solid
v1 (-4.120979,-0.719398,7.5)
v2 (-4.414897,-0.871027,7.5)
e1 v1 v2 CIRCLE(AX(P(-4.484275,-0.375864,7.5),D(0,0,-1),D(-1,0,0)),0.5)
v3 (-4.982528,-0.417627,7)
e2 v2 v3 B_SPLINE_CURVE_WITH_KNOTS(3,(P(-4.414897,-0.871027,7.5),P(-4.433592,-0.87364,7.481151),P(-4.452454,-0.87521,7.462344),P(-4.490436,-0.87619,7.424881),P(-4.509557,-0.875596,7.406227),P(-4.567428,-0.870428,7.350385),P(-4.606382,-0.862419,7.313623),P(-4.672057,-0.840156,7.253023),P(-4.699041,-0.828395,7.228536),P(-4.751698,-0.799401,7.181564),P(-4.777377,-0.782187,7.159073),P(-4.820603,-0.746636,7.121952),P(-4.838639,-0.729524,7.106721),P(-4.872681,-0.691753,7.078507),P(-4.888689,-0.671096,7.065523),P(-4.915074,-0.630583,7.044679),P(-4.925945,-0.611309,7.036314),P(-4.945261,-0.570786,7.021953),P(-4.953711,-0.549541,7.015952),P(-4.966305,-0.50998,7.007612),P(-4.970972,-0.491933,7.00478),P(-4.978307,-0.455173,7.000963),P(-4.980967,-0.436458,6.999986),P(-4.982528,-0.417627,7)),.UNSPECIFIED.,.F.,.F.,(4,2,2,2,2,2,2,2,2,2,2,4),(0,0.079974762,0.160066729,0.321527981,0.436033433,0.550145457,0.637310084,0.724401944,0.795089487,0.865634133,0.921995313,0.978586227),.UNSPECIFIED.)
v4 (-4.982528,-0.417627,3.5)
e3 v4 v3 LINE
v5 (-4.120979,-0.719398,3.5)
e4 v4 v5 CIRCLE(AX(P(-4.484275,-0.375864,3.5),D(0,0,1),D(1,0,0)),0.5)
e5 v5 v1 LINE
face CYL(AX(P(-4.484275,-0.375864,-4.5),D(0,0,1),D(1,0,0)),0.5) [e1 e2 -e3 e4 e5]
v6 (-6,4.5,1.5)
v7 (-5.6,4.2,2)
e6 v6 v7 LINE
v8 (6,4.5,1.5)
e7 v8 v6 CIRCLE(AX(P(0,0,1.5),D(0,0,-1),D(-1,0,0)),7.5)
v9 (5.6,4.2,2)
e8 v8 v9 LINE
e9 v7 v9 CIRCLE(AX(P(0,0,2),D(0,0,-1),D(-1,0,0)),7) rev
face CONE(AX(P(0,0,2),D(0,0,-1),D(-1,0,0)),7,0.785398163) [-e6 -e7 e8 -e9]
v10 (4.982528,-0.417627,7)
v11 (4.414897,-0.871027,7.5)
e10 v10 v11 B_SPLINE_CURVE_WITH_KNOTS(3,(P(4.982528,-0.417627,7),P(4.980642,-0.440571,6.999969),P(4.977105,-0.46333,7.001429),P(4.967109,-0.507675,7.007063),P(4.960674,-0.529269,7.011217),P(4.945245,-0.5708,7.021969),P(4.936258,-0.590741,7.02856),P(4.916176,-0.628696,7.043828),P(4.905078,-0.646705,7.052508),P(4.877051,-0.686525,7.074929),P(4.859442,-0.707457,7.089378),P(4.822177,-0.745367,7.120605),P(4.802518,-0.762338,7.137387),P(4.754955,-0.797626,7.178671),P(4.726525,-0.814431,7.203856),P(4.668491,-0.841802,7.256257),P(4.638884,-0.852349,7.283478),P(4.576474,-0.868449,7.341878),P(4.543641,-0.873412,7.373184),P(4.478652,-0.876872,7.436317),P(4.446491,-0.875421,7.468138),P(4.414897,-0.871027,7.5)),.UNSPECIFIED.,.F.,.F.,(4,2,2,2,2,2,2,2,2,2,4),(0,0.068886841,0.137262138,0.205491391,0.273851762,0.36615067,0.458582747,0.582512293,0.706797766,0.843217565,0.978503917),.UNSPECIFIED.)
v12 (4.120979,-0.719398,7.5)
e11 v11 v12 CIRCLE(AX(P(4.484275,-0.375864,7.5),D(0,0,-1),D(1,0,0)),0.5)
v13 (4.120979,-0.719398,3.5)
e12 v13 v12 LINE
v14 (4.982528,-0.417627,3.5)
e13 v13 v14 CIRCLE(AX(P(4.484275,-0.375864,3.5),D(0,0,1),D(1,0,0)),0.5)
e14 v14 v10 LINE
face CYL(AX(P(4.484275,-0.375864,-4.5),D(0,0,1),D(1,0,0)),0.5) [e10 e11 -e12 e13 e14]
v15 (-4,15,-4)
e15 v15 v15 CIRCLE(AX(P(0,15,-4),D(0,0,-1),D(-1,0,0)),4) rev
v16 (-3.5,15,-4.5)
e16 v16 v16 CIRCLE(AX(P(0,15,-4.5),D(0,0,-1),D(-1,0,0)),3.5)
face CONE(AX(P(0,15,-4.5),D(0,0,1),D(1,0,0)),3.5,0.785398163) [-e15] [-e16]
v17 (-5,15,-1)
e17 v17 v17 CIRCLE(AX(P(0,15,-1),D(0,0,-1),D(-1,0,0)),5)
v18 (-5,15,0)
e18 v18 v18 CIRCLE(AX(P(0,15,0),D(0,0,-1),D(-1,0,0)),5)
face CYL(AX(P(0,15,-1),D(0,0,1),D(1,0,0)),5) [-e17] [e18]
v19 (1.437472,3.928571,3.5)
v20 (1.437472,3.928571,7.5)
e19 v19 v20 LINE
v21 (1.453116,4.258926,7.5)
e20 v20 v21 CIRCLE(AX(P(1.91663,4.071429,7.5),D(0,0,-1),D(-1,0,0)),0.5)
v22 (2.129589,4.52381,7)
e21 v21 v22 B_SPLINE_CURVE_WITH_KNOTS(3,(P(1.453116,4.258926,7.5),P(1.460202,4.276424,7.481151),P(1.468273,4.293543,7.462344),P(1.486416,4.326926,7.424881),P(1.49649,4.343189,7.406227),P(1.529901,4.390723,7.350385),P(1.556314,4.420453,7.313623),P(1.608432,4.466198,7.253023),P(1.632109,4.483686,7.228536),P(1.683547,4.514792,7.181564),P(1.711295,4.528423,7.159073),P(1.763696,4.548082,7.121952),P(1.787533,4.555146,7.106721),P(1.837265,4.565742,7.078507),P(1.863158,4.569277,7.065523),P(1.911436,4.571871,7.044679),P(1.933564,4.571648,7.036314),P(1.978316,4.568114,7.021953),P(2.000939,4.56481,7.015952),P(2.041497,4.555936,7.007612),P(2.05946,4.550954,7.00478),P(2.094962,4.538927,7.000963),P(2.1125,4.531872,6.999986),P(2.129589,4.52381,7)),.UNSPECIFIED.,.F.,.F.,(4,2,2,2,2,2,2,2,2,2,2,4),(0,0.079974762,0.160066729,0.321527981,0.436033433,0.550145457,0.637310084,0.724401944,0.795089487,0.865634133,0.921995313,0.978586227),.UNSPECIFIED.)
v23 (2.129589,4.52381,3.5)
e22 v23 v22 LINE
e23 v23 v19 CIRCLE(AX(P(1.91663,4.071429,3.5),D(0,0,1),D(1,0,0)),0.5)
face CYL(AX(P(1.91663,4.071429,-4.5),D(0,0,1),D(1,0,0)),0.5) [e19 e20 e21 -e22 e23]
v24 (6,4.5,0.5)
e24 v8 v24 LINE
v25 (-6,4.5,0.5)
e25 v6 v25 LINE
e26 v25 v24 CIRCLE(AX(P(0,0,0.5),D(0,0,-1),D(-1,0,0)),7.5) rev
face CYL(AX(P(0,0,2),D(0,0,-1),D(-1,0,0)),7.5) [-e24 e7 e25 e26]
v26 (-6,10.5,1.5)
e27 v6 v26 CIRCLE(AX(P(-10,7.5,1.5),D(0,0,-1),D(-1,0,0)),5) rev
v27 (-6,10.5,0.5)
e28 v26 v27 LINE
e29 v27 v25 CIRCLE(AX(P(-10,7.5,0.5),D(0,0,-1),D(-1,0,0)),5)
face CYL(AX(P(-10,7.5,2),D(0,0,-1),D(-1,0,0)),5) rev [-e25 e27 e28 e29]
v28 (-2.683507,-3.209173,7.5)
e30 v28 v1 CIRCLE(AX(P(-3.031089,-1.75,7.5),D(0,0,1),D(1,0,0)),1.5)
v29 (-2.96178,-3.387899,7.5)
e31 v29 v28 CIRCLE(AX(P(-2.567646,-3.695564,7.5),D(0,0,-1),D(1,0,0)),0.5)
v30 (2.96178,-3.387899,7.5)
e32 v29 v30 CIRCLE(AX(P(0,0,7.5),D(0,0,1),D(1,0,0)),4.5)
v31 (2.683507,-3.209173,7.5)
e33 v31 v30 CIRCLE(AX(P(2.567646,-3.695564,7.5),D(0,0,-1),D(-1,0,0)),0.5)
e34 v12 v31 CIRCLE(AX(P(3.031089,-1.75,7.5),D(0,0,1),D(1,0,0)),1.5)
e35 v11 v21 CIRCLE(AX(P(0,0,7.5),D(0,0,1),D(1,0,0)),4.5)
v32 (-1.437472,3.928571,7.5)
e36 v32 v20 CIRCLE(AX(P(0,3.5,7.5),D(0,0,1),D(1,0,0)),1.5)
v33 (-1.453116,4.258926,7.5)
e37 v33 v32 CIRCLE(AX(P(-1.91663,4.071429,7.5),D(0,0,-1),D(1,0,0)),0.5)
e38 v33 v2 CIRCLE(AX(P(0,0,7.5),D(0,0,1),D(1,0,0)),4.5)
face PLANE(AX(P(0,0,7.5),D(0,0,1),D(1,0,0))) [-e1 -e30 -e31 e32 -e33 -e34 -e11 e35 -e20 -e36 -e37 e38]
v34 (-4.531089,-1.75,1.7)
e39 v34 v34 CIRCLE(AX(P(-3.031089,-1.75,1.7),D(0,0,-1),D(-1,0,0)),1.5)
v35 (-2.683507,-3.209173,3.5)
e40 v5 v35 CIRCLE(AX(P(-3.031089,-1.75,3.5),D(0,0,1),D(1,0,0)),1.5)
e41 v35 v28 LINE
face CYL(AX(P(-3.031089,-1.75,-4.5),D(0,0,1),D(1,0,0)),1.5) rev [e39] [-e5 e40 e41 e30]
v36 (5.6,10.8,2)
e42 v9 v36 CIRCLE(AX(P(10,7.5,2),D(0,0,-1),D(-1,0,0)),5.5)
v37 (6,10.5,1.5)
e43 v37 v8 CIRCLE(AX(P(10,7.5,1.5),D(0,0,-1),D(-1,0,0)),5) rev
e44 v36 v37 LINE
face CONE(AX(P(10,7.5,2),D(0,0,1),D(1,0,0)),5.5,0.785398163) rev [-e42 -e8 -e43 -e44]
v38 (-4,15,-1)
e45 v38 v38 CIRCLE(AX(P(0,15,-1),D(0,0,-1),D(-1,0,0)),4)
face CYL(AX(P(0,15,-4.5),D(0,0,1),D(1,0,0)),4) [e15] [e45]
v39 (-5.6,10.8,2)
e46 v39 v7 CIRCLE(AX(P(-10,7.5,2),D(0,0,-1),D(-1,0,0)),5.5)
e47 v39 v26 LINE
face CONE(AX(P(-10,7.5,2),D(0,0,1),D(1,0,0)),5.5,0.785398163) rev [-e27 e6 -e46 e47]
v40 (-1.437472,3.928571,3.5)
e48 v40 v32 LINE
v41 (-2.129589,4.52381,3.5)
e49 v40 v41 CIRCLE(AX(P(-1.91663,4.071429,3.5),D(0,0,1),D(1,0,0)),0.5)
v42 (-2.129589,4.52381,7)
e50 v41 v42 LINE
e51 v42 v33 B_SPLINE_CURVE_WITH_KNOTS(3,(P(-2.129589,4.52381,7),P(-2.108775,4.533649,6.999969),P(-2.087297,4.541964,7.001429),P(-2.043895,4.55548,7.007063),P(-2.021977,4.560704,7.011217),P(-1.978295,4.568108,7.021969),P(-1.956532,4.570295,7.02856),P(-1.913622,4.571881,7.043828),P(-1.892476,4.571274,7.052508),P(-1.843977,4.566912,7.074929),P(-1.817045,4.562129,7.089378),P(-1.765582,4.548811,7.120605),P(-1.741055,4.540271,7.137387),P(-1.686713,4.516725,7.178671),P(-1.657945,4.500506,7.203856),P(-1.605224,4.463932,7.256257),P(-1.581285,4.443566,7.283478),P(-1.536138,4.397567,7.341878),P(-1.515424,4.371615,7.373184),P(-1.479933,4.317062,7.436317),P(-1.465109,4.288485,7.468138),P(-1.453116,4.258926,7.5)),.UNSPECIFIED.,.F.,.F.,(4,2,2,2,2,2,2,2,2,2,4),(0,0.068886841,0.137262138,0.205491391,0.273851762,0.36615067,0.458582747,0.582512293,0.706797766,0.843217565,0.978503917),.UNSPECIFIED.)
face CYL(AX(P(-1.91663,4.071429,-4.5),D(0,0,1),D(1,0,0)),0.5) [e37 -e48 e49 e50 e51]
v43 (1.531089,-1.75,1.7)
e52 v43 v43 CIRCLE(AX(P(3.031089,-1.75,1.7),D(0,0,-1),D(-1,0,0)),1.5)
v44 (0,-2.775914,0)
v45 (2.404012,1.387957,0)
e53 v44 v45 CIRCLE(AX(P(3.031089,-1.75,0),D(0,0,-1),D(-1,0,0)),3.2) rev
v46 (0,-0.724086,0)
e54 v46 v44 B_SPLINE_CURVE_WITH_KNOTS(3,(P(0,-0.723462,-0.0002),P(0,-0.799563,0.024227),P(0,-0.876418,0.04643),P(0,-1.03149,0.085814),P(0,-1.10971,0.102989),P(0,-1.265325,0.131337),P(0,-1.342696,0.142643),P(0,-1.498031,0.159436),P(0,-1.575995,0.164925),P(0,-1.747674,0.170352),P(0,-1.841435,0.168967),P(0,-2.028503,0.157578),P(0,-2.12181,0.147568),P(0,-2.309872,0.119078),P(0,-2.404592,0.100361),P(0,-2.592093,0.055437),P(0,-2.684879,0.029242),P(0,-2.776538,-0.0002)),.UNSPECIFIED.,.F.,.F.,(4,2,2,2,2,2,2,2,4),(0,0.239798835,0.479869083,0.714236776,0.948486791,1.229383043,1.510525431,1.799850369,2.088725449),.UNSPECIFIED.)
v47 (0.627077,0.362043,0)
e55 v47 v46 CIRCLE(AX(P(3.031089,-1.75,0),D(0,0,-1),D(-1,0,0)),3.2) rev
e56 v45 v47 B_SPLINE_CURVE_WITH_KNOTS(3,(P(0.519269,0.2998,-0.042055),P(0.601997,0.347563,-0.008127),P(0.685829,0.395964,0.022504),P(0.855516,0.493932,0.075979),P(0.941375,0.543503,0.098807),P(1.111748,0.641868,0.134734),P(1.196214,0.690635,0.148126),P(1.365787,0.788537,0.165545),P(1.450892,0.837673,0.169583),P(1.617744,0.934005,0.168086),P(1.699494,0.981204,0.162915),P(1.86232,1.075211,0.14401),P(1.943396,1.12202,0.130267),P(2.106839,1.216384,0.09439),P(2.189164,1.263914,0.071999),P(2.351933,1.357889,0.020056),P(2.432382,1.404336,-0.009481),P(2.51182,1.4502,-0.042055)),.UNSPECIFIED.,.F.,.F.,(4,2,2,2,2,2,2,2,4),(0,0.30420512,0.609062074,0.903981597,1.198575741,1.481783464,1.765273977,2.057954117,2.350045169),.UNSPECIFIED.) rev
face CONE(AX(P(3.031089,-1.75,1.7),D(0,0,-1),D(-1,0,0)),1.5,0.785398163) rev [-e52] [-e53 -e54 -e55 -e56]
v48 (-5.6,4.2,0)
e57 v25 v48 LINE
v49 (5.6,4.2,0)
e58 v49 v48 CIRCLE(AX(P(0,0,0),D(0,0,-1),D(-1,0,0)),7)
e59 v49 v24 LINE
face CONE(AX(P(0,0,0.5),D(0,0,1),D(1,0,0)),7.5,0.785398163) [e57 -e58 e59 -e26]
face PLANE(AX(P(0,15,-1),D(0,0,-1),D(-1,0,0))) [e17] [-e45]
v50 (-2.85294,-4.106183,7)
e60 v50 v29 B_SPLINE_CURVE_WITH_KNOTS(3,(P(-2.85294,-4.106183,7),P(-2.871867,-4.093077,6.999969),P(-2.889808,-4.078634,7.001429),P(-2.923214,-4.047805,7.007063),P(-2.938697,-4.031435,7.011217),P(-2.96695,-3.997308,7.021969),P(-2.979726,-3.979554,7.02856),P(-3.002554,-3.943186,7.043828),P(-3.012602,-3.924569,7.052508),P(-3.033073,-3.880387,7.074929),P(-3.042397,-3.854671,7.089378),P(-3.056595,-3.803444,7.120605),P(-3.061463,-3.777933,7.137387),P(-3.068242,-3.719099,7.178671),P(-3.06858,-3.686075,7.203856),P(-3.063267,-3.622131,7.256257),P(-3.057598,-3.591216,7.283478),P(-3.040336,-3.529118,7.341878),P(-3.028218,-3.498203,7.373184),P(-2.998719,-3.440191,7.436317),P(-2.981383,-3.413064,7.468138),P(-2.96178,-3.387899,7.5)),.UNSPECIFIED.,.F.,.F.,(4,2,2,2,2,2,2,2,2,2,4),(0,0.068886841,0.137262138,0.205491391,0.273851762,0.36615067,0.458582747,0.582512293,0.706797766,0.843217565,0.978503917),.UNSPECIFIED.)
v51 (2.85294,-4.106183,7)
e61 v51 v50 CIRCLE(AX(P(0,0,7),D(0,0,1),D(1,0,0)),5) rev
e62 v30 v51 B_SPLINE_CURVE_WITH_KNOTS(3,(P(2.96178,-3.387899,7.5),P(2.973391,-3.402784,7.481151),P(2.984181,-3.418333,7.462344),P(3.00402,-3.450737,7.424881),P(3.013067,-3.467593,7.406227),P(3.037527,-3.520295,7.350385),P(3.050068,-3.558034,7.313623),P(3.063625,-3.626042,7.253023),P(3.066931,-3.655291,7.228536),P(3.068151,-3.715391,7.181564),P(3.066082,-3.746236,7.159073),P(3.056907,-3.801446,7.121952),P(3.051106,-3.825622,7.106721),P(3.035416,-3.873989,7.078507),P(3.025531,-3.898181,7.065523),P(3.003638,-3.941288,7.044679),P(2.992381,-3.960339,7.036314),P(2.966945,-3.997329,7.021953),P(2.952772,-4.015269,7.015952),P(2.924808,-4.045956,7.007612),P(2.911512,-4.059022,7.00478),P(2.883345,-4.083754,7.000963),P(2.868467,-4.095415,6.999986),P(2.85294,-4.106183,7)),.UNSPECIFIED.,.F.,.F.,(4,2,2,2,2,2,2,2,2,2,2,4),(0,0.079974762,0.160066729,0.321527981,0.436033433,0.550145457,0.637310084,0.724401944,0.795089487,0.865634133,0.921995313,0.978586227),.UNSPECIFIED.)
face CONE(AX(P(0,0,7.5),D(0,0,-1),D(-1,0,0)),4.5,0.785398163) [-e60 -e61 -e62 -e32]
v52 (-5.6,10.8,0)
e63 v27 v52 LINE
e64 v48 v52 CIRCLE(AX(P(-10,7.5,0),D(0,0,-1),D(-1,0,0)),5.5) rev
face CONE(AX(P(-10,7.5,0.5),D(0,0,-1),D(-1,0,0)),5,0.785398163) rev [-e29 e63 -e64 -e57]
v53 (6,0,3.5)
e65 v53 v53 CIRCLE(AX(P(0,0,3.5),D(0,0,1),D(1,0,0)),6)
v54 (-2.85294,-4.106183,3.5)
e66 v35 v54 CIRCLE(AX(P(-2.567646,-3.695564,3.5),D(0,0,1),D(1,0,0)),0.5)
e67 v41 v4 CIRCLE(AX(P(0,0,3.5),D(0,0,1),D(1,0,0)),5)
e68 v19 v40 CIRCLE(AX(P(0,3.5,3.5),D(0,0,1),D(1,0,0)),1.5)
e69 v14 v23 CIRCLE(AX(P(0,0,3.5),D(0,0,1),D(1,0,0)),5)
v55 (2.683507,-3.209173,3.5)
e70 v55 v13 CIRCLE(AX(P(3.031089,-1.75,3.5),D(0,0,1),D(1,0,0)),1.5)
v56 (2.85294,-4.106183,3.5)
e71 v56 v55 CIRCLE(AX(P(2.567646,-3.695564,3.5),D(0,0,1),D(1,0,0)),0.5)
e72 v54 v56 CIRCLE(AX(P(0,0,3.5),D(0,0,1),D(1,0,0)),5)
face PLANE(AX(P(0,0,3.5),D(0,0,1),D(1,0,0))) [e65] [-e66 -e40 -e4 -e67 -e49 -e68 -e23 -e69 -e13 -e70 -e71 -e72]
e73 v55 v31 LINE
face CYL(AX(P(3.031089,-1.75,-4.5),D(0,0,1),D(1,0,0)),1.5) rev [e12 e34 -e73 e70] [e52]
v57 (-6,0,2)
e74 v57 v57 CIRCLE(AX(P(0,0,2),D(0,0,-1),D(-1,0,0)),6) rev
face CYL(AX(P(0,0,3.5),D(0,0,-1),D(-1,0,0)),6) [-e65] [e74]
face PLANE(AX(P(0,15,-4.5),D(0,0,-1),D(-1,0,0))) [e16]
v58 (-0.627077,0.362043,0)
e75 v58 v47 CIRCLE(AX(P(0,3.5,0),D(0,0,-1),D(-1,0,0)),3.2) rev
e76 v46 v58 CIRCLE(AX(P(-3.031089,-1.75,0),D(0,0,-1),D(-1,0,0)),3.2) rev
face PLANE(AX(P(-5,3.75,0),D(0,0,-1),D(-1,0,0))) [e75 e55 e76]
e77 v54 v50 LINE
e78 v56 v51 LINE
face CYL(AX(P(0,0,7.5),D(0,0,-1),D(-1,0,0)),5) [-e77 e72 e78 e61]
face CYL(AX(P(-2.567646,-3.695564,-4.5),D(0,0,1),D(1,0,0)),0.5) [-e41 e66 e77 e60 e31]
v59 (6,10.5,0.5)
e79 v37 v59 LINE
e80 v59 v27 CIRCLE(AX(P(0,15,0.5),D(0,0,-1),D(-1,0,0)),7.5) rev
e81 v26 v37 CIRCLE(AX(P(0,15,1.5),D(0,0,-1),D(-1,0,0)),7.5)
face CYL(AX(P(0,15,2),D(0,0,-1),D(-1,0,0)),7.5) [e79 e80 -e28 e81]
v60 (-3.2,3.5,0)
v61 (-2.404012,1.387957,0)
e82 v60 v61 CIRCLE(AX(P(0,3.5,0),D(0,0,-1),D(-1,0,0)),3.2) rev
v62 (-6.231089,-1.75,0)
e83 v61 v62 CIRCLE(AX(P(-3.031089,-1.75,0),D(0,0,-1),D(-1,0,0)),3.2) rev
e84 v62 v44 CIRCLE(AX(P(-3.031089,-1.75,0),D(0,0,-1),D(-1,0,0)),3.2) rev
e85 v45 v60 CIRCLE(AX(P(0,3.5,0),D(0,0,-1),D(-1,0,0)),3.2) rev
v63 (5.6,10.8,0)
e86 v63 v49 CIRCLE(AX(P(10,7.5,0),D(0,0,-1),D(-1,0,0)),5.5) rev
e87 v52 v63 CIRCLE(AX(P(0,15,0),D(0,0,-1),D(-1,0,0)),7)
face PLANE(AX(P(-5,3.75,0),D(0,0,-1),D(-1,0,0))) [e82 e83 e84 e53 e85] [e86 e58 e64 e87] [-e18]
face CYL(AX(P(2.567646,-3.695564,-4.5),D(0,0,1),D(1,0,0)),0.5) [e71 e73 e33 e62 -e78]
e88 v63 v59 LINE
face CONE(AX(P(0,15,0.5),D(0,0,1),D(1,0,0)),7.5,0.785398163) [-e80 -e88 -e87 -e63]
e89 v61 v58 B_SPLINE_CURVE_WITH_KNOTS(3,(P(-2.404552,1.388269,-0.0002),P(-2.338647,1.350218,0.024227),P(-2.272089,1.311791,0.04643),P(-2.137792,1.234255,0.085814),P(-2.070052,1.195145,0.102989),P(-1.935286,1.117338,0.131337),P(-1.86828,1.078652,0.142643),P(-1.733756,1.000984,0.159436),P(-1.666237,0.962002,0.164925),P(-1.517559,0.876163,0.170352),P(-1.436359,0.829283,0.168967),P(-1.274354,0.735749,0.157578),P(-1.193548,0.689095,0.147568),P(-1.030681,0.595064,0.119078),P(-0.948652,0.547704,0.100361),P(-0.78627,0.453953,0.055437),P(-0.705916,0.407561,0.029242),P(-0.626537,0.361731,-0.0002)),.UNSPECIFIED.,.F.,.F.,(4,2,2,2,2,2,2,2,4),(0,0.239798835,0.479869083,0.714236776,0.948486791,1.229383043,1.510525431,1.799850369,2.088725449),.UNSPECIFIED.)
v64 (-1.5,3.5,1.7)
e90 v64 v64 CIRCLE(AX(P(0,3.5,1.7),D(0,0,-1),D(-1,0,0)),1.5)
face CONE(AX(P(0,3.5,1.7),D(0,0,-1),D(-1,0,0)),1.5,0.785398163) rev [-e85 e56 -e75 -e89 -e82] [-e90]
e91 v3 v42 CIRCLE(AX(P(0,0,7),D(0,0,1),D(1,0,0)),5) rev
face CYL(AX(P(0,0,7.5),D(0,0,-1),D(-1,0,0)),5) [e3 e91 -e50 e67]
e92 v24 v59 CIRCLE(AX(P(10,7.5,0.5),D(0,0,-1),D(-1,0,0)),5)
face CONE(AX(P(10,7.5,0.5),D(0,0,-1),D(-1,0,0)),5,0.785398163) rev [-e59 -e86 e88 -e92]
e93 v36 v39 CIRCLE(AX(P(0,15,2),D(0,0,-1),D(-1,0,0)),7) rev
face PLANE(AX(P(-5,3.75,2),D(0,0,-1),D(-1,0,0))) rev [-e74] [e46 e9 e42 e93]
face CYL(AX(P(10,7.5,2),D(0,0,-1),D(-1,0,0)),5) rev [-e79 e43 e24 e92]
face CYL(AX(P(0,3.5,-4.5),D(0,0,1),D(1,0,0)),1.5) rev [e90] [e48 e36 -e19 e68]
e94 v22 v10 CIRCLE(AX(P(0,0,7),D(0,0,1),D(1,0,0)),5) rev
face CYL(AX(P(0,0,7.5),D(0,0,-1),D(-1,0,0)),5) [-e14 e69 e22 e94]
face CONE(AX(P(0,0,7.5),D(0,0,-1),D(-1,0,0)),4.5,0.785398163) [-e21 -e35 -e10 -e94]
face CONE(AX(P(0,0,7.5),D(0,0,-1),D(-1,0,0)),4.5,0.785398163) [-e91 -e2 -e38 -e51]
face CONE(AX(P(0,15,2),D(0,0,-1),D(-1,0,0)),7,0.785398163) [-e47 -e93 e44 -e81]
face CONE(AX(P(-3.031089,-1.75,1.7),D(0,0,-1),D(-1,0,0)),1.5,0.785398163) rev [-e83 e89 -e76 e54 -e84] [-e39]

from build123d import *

# Parameters (mm, degrees)
EXTRUDE_1_DEPTH     = 2
SKETCH_2_R          = 6
EXTRUDE_2_DEPTH     = 1.5
SKETCH_3_R          = 5
EXTRUDE_3_DEPTH     = 4
SKETCH_4_R          = 5
EXTRUDE_4_DEPTH     = 1
SKETCH_5_R          = 4
EXTRUDE_5_DEPTH     = 3.5
CUT_EXTRUDE_1_DEPTH = 27.58006772
EXTRUDE_START       = -3.5
SKETCH_9_R          = 6
EXTRUDE_6_DEPTH     = 3.5
SKETCH_10_R         = 1.5
CUT_EXTRUDE_2_DEPTH = 26.029982022
CHAMFER_1_SIZE      = 1.7
CHAMFER_2_SIZE      = 0.5
CHAMFER_3_SIZE      = 0.5


with BuildPart() as part:
    # ｽｹｯﾁ1 → ﾎﾞｽ - 押し出し1 (new body)
    with BuildSketch(Plane.XY):
        with BuildLine():
            ThreePointArc((-6, 4.5), (0, -7.5), (6, 4.5))
            ThreePointArc((6, 4.5), (5, 7.5), (6, 10.5))
            ThreePointArc((6, 10.5), (0, 22.5), (-6, 10.5))
            ThreePointArc((-6, 10.5), (-5, 7.5), (-6, 4.5))
        make_face()
    extrude(amount=EXTRUDE_1_DEPTH)

    # ｽｹｯﾁ2 → ﾎﾞｽ - 押し出し2 (add)
    with BuildSketch(Plane.XY.offset(2)):
        with Locations(Location((0, 0, 0), (0, 0, 180))):
            Circle(SKETCH_2_R)
    extrude(amount=EXTRUDE_2_DEPTH)

    # ｽｹｯﾁ3 → ﾎﾞｽ - 押し出し3 (add)
    with BuildSketch(Plane.XY.offset(3.5)):
        Circle(SKETCH_3_R)
    extrude(amount=EXTRUDE_3_DEPTH)

    # ｽｹｯﾁ4 → ﾎﾞｽ - 押し出し4 (add)
    with BuildSketch(Plane(origin=(0, 0, 0), x_dir=(-1, 0, 0), z_dir=(0, 0, -1))):
        with Locations((0, 15)):
            Circle(SKETCH_4_R)
    extrude(amount=EXTRUDE_4_DEPTH)

    # ｽｹｯﾁ5 → ﾎﾞｽ - 押し出し5 (add)
    with BuildSketch(Plane(origin=(0, 0, -1), x_dir=(-1, 0, 0), z_dir=(0, 0, -1))):
        with Locations((0, 15)):
            Circle(SKETCH_5_R)
    extrude(amount=EXTRUDE_5_DEPTH)

    # ｽｹｯﾁ8 → ｶｯﾄ - 押し出し1 (cut, through all)
    with BuildSketch(Plane.XY.offset(7.5)):
        with BuildLine():
            ThreePointArc((-1.437472271, 3.928571429), (0, 2), (1.437472271, 3.928571429))
            ThreePointArc((1.437472271, 3.928571429), (1.590604363, 4.45051627), (2.12958855, 4.523809524))
            ThreePointArc((2.12958855, 4.523809524), (0, 5), (-2.12958855, 4.523809524))
            ThreePointArc((-2.12958855, 4.523809524), (-1.590604363, 4.45051627), (-1.437472271, 3.928571429))
        make_face()
        with BuildLine():
            ThreePointArc((4.120978793, -0.71939821), (1.732050808, -1), (2.683506522, -3.209173218))
            ThreePointArc((2.683506522, -3.209173218), (3.058957968, -3.602761921), (2.852939695, -4.106182546))
            ThreePointArc((2.852939695, -4.106182546), (4.330127019, -2.5), (4.982528245, -0.417626978))
            ThreePointArc((4.982528245, -0.417626978), (4.649562331, -0.847754349), (4.120978793, -0.71939821))
        make_face()
        with BuildLine():
            ThreePointArc((-2.683506522, -3.209173218), (-1.732050808, -1), (-4.120978793, -0.71939821))
            ThreePointArc((-4.120978793, -0.71939821), (-4.649562331, -0.847754349), (-4.982528245, -0.417626978))
            ThreePointArc((-4.982528245, -0.417626978), (-4.330127019, -2.5), (-2.852939695, -4.106182546))
            ThreePointArc((-2.852939695, -4.106182546), (-3.058957968, -3.602761921), (-2.683506522, -3.209173218))
        make_face()
    extrude(amount=-CUT_EXTRUDE_1_DEPTH, mode=Mode.SUBTRACT)

    # ｽｹｯﾁ9 → ﾎﾞｽ - 押し出し6 (add)
    with BuildSketch(Plane.XY.offset(3.5).offset(EXTRUDE_START)):
        with Locations(Location((0, 0, 0), (0, 0, 180))):
            Circle(SKETCH_9_R)
    extrude(amount=EXTRUDE_6_DEPTH)

    # ｽｹｯﾁ10 → ｶｯﾄ - 押し出し2 (cut, through all)
    with BuildSketch(Plane.XY.offset(3.5)):
        with Locations(Location((0, 3.5, 0), (0, 0, 16.601549599))):
            Circle(SKETCH_10_R)
        with Locations(Location((-3.031088913, -1.75, 0), (0, 0, 283.398450401))):
            Circle(SKETCH_10_R)
        with Locations(Location((3.031088913, -1.75, 0), (0, 0, 43.398450401))):
            Circle(SKETCH_10_R)
    extrude(amount=-CUT_EXTRUDE_2_DEPTH, mode=Mode.SUBTRACT)

    # 面取り1
    # the kernel refuses this chamfer: 1.7 mm, written as the material it takes off along each edge
    with BuildSketch(Plane(origin=(0, 3.5, 0), x_dir=(0.9583148475000108, 0.28571428571394725, 0), z_dir=(0.28571428571394725, -0.9583148475000108, 0))) as chamfer_1_piece_1:
        Polygon((1.5 + CHAMFER_1_SIZE, 0), (1.5, CHAMFER_1_SIZE), (1.5, 0), align=None)
    revolve(axis=Axis((0, 3.5, 0), (0, 0, 1)), mode=Mode.SUBTRACT)
    with BuildSketch(Plane(origin=(-3.031088913, -1.75, 0), x_dir=(0.2317215940976018, -0.9727821456157932, 0), z_dir=(-0.9727821456157932, -0.2317215940976018, 0))) as chamfer_1_piece_2:
        Polygon((1.5 + CHAMFER_1_SIZE, 0), (1.5, CHAMFER_1_SIZE), (1.5, 0), align=None)
    revolve(axis=Axis((-3.031088913, -1.75, 0), (0, 0, 1)), mode=Mode.SUBTRACT)
    with BuildSketch(Plane(origin=(3.031088913, -1.75, 0), x_dir=(0.7265932534024093, 0.6870678599018457, 0), z_dir=(0.6870678599018457, -0.7265932534024093, 0))) as chamfer_1_piece_3:
        Polygon((1.5 + CHAMFER_1_SIZE, 0), (1.5, CHAMFER_1_SIZE), (1.5, 0), align=None)
    revolve(axis=Axis((3.031088913, -1.75, 0), (0, 0, 1)), mode=Mode.SUBTRACT)

    # 面取り2
    chamfer_2_edges = [part.edges().sort_by_distance(p)[0] for p in [
        (4, 15, -4.5),
        (0, 22.5, 0),
        (5, 7.5, 0),
        (0, -7.5, 0),
        (-5, 7.5, 0),
    ]]
    chamfer(chamfer_2_edges, length=CHAMFER_2_SIZE)

    # 面取り3
    # the kernel refuses this chamfer: 0.5 mm, written as the material it takes off along each edge
    with BuildSketch(Plane(origin=(10, 7.5, 2), x_dir=(-0.7999999999999996, -0.6000000000000005, 0), z_dir=(0.6000000000000005, -0.7999999999999996, 0))) as chamfer_3_piece_1:
        Polygon((5, CHAMFER_3_SIZE), (5 + CHAMFER_3_SIZE, 0), (5, 0), align=None)
    revolve(axis=Axis((10, 7.5, 2), (0, 0, -1)), revolution_arc=73.739795292, mode=Mode.SUBTRACT)
    with BuildSketch(Plane(origin=(0, 15, 2), x_dir=(0.7999999999999998, -0.6000000000000002, 0), z_dir=(-0.6000000000000002, -0.7999999999999998, 0))) as chamfer_3_piece_2:
        Polygon((7.5 - CHAMFER_3_SIZE, 0), (7.5, -CHAMFER_3_SIZE), (7.5, 0), align=None)
    revolve(axis=Axis((0, 15, 2), (0, 0, 1)), revolution_arc=253.739795292, mode=Mode.SUBTRACT)
    with BuildSketch(Plane(origin=(0, 0, 7.5), x_dir=(-0.18173044344345904, 0.9833483848188515, 0), z_dir=(0.9833483848188515, 0.18173044344345904, 0))) as chamfer_3_piece_3:
        Polygon((5, -CHAMFER_3_SIZE), (5 - CHAMFER_3_SIZE, 0), (5, 0), align=None)
    revolve(axis=Axis((0, 0, 7.5), (0, 0, 1)), revolution_arc=99.05886102, mode=Mode.SUBTRACT)
    with BuildSketch(Plane(origin=(-10, 7.5, 2), x_dir=(0.8, 0.6, 0), z_dir=(-0.6, 0.8, 0))) as chamfer_3_piece_4:
        Polygon((5 + CHAMFER_3_SIZE, 0), (5, CHAMFER_3_SIZE), (5, 0), align=None)
    revolve(axis=Axis((-10, 7.5, 2), (0, 0, -1)), revolution_arc=73.739795292, mode=Mode.SUBTRACT)
    with BuildSketch(Plane(origin=(0, 0, 7.5), x_dir=(0.9424699037452493, -0.3342910117463833, 0), z_dir=(-0.3342910117463833, -0.9424699037452493, 0))) as chamfer_3_piece_5:
        Polygon((5, -CHAMFER_3_SIZE), (5 - CHAMFER_3_SIZE, 0), (5, 0), align=None)
    revolve(axis=Axis((0, 0, 7.5), (0, 0, 1)), revolution_arc=99.05886102, mode=Mode.SUBTRACT)
    with BuildSketch(Plane(origin=(0, 0, 7.5), x_dir=(-0.7607394603017978, -0.6490573730724652, 0), z_dir=(-0.6490573730724652, 0.7607394603017978, 0))) as chamfer_3_piece_6:
        Polygon((5, -CHAMFER_3_SIZE), (5 - CHAMFER_3_SIZE, 0), (5, 0), align=None)
    revolve(axis=Axis((0, 0, 7.5), (0, 0, 1)), revolution_arc=99.05886102, mode=Mode.SUBTRACT)
    with BuildSketch(Plane(origin=(0, 0, 2), x_dir=(-0.7999999999999997, 0.6000000000000003, 0), z_dir=(0.6000000000000003, 0.7999999999999997, 0))) as chamfer_3_piece_7:
        Polygon((7.5, -CHAMFER_3_SIZE), (7.5 - CHAMFER_3_SIZE, 0), (7.5, 0), align=None)
    revolve(axis=Axis((0, 0, 2), (0, 0, 1)), revolution_arc=253.739795292, mode=Mode.SUBTRACT)


solid = part.part
